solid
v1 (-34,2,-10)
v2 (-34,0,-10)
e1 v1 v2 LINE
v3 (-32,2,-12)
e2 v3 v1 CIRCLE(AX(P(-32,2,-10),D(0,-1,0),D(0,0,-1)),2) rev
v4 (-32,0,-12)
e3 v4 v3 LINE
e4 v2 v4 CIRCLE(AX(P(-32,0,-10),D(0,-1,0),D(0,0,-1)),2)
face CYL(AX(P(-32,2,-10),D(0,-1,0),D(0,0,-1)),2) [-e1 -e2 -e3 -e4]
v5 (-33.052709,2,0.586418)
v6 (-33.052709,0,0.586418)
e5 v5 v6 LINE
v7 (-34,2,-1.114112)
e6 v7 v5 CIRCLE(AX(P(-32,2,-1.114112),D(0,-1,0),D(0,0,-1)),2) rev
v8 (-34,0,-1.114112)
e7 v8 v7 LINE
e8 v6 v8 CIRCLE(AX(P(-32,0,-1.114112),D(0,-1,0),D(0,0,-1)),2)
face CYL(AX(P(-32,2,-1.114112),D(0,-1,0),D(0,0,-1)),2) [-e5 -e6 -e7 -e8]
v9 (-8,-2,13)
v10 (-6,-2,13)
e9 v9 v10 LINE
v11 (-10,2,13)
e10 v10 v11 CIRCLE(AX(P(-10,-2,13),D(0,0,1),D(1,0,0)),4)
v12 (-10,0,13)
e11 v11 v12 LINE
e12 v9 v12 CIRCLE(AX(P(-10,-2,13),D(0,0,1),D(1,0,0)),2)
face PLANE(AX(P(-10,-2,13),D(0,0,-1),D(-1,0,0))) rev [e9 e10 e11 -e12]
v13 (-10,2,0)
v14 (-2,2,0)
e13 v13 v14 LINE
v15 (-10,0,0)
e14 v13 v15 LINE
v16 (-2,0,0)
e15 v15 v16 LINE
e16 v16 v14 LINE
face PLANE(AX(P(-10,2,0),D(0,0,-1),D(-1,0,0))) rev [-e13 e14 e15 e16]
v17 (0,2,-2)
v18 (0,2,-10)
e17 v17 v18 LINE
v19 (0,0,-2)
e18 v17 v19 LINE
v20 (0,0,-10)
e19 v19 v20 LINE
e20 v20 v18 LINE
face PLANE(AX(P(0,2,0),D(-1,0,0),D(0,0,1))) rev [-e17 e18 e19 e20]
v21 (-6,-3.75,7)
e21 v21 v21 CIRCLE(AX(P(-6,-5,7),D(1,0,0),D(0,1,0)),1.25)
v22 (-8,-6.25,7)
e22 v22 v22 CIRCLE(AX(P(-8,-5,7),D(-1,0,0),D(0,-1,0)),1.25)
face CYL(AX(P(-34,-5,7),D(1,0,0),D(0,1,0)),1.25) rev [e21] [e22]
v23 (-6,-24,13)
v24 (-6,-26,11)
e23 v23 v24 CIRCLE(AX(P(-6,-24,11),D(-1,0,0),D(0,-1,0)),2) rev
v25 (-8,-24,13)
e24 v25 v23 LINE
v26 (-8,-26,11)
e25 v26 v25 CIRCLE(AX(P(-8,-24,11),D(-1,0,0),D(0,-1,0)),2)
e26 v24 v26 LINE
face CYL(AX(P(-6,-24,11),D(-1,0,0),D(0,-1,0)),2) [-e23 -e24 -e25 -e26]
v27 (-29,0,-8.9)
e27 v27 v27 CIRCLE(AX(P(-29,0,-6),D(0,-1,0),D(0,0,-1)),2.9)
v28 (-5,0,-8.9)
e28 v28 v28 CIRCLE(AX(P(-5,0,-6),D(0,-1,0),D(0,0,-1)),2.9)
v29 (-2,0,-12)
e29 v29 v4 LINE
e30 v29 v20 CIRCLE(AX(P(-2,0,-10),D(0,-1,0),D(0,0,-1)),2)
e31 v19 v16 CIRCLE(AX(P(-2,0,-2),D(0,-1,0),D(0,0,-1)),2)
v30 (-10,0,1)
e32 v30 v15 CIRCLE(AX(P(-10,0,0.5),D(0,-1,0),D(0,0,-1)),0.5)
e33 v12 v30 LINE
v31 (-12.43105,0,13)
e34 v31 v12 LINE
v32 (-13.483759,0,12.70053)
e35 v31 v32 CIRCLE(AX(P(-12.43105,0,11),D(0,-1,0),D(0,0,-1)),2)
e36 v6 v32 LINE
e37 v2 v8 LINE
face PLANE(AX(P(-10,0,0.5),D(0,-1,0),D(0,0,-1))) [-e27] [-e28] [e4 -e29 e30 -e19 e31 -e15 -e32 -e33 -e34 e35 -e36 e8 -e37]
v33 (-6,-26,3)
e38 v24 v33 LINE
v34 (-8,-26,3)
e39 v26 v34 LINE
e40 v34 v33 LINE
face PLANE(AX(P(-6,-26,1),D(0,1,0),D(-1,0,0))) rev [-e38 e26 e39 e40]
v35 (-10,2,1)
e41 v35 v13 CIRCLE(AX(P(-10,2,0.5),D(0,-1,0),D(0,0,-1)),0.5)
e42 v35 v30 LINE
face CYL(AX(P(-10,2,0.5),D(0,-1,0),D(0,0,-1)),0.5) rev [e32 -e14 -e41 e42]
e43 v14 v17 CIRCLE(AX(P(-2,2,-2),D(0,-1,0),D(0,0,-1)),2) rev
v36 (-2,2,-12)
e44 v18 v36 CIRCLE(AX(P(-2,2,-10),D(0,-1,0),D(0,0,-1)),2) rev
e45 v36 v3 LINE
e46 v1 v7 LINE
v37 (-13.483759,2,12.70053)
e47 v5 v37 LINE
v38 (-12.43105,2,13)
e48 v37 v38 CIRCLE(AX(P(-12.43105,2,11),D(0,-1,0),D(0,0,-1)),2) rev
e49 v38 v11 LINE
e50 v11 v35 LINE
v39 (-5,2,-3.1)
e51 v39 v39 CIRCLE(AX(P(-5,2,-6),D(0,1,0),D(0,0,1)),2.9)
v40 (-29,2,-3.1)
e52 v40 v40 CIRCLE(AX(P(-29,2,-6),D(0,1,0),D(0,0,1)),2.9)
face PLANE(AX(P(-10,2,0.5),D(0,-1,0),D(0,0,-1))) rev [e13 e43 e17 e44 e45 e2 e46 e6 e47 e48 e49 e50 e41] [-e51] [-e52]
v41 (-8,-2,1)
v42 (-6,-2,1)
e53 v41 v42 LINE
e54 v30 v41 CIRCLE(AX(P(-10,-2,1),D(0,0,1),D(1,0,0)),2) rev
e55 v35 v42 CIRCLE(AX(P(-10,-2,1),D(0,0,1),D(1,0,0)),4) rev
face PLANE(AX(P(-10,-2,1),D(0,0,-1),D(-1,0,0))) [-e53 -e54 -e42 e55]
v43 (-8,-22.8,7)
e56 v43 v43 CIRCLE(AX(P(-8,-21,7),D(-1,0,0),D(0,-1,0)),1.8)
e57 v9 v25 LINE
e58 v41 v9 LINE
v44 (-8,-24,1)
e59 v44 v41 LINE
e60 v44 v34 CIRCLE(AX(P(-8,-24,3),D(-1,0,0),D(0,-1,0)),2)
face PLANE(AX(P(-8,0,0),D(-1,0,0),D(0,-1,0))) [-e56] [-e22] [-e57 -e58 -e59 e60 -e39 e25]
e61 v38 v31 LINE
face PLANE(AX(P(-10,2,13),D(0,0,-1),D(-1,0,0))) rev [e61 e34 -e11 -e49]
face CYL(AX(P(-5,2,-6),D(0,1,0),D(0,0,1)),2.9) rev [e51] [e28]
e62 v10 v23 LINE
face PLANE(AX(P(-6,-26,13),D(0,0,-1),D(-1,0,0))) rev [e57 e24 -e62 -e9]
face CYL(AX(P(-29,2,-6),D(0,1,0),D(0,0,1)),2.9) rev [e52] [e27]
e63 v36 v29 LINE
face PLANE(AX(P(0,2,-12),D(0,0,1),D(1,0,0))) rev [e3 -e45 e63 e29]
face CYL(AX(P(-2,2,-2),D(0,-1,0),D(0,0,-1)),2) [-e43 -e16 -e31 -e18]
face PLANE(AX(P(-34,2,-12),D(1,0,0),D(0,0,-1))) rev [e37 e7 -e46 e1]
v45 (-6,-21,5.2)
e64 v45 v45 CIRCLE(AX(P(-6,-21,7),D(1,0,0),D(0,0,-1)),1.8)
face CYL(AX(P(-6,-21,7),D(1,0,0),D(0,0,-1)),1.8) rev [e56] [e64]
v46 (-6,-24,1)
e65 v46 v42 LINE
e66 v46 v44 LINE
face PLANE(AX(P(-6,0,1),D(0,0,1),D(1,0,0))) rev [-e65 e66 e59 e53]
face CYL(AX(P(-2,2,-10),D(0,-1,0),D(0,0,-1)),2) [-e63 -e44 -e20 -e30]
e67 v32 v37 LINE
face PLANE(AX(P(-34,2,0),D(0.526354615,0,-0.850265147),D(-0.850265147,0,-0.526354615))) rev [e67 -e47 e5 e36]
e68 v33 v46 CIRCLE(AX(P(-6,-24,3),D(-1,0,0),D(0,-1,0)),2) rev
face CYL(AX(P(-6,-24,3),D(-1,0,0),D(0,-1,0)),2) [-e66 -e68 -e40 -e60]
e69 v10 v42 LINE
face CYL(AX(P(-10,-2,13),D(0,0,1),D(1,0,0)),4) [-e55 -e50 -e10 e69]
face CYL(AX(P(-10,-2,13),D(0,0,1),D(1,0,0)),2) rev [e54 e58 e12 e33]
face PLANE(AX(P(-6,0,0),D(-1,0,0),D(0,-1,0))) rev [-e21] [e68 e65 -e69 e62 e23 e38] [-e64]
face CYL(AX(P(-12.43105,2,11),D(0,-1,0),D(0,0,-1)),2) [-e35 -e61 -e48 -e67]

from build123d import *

# Parameters (mm, degrees)
BASE_FLANGE1_DEPTH    = 2
EDGE_FLANGE1_DEPTH    = 12
M5_CLEARANCE_HOLE1_D  = 5.8
M3_CLEARANCE_HOLE1_D  = 3.6
SKETCH14_R            = 1.25
CUT_EXTRUDE1_DEPTH    = 41.360872141
BREAK_CORNER1_START   = -8
BREAK_CORNER1_DEPTH   = 2
BREAK_CORNER1_2_DEPTH = 2


# Read off the part's stored shape, not the designer's step: Break-Corner1
# Sheet-metal steps are written as plain solids
with BuildPart() as part:
    # Sketch1 → Base-Flange1 (new body)
    with BuildSketch(Plane(origin=(0, 0, 0), x_dir=(1, 0, 0), z_dir=(0, 1, 0))):
        with BuildLine():
            Line((0, 0), (0, 12))
            Line((0, 12), (-34, 12))
            Line((-34, 12), (-34, 0))
            Line((-34, 0), (-13, -13))
            Line((-13, -13), (-10, -13))
            Line((-10, -13), (-10, -1))
            ThreePointArc((-10, -1), (-10.5, -0.5), (-10, 0))
            Line((-10, 0), (0, 0))
        make_face()
    extrude(amount=BASE_FLANGE1_DEPTH)

    # Edge-Flange1 section (across the edge) → Edge-Flange1 (add)
    with BuildSketch(Plane(origin=(-8, 0, 1), x_dir=(-1, 0, 0), z_dir=(0, 0, 1))):
        with BuildLine():
            Line((-2, 2), (-2, 26))
            Line((-2, 26), (0, 26))
            Line((0, 26), (0, 2))
            ThreePointArc((0, 2), (0.585786438, 0.585786438), (2, 0))
            Line((2, 0), (2, -2))
            ThreePointArc((2, -2), (-0.828427125, -0.828427125), (-2, 2))
        make_face()
    extrude(amount=EDGE_FLANGE1_DEPTH)

    # M5 Clearance Hole1 (through all)
    with Locations(Plane(origin=(0, 2, 0), x_dir=(1, 0, 0), z_dir=(0, 1, 0))):
        with Locations((-29, 6), (-5, 6)):
            Hole(M5_CLEARANCE_HOLE1_D / 2)

    # M3 Clearance Hole1 (through all)
    with Locations(Plane(origin=(-6, 0, 0), x_dir=(0, 0, -1), z_dir=(1, 0, 0))):
        with Locations((-7, -21)):
            Hole(M3_CLEARANCE_HOLE1_D / 2)

    # Sketch14 → Cut-Extrude1 (cut, through all)
    with BuildSketch(Plane(origin=(-6, 0, 0), x_dir=(0, 0, -1), z_dir=(1, 0, 0))):
        with Locations(Location((-7, -5, 0), (0, 0, 90))):
            Circle(SKETCH14_R)
    extrude(amount=-CUT_EXTRUDE1_DEPTH, mode=Mode.SUBTRACT)

    # Break-Corner1 outline → Break-Corner1 (cut)
    with BuildSketch(Plane.YZ.offset(BREAK_CORNER1_START)):
        with BuildLine():
            Line((-26, 1), (-24, 1))
            ThreePointArc((-24, 1), (-25.414213562, 1.585786438), (-26, 3))
            Line((-26, 3), (-26, 1))
        make_face()
        with BuildLine():
            Line((-26, 13), (-26, 11))
            ThreePointArc((-26, 11), (-25.414213562, 12.414213562), (-24, 13))
            Line((-24, 13), (-26, 13))
        make_face()
    extrude(amount=BREAK_CORNER1_DEPTH, mode=Mode.SUBTRACT)

    # Break-Corner1 2 outline → Break-Corner1 2 (cut)
    with BuildSketch(Plane(origin=(0, 0, 0), x_dir=(1, 0, 0), z_dir=(0, 1, 0))):
        with BuildLine():
            Line((-13, -13), (-12.431049528, -13))
            ThreePointArc((-12.431049528, -13), (-12.978287782, -12.923676244), (-13.483758757, -12.700530293))
            Line((-13.483758757, -12.700530293), (-13, -13))
        make_face()
        with BuildLine():
            Line((0, 0), (0, 2))
            ThreePointArc((0, 2), (-0.585786438, 0.585786438), (-2, 0))
            Line((-2, 0), (0, 0))
        make_face()
        with BuildLine():
            Line((0, 12), (-2, 12))
            ThreePointArc((-2, 12), (-0.585786438, 11.414213562), (0, 10))
            Line((0, 10), (0, 12))
        make_face()
        with BuildLine():
            Line((-34, 12), (-34, 10))
            ThreePointArc((-34, 10), (-33.414213562, 11.414213562), (-32, 12))
            Line((-32, 12), (-34, 12))
        make_face()
        with BuildLine():
            Line((-34, 0), (-33.052709229, -0.586418096))
            ThreePointArc((-33.052709229, -0.586418096), (-33.747200398, 0.14082356), (-34, 1.114112197))
            Line((-34, 1.114112197), (-34, 0))
        make_face()
    extrude(amount=BREAK_CORNER1_2_DEPTH, mode=Mode.SUBTRACT)


solid = part.part
